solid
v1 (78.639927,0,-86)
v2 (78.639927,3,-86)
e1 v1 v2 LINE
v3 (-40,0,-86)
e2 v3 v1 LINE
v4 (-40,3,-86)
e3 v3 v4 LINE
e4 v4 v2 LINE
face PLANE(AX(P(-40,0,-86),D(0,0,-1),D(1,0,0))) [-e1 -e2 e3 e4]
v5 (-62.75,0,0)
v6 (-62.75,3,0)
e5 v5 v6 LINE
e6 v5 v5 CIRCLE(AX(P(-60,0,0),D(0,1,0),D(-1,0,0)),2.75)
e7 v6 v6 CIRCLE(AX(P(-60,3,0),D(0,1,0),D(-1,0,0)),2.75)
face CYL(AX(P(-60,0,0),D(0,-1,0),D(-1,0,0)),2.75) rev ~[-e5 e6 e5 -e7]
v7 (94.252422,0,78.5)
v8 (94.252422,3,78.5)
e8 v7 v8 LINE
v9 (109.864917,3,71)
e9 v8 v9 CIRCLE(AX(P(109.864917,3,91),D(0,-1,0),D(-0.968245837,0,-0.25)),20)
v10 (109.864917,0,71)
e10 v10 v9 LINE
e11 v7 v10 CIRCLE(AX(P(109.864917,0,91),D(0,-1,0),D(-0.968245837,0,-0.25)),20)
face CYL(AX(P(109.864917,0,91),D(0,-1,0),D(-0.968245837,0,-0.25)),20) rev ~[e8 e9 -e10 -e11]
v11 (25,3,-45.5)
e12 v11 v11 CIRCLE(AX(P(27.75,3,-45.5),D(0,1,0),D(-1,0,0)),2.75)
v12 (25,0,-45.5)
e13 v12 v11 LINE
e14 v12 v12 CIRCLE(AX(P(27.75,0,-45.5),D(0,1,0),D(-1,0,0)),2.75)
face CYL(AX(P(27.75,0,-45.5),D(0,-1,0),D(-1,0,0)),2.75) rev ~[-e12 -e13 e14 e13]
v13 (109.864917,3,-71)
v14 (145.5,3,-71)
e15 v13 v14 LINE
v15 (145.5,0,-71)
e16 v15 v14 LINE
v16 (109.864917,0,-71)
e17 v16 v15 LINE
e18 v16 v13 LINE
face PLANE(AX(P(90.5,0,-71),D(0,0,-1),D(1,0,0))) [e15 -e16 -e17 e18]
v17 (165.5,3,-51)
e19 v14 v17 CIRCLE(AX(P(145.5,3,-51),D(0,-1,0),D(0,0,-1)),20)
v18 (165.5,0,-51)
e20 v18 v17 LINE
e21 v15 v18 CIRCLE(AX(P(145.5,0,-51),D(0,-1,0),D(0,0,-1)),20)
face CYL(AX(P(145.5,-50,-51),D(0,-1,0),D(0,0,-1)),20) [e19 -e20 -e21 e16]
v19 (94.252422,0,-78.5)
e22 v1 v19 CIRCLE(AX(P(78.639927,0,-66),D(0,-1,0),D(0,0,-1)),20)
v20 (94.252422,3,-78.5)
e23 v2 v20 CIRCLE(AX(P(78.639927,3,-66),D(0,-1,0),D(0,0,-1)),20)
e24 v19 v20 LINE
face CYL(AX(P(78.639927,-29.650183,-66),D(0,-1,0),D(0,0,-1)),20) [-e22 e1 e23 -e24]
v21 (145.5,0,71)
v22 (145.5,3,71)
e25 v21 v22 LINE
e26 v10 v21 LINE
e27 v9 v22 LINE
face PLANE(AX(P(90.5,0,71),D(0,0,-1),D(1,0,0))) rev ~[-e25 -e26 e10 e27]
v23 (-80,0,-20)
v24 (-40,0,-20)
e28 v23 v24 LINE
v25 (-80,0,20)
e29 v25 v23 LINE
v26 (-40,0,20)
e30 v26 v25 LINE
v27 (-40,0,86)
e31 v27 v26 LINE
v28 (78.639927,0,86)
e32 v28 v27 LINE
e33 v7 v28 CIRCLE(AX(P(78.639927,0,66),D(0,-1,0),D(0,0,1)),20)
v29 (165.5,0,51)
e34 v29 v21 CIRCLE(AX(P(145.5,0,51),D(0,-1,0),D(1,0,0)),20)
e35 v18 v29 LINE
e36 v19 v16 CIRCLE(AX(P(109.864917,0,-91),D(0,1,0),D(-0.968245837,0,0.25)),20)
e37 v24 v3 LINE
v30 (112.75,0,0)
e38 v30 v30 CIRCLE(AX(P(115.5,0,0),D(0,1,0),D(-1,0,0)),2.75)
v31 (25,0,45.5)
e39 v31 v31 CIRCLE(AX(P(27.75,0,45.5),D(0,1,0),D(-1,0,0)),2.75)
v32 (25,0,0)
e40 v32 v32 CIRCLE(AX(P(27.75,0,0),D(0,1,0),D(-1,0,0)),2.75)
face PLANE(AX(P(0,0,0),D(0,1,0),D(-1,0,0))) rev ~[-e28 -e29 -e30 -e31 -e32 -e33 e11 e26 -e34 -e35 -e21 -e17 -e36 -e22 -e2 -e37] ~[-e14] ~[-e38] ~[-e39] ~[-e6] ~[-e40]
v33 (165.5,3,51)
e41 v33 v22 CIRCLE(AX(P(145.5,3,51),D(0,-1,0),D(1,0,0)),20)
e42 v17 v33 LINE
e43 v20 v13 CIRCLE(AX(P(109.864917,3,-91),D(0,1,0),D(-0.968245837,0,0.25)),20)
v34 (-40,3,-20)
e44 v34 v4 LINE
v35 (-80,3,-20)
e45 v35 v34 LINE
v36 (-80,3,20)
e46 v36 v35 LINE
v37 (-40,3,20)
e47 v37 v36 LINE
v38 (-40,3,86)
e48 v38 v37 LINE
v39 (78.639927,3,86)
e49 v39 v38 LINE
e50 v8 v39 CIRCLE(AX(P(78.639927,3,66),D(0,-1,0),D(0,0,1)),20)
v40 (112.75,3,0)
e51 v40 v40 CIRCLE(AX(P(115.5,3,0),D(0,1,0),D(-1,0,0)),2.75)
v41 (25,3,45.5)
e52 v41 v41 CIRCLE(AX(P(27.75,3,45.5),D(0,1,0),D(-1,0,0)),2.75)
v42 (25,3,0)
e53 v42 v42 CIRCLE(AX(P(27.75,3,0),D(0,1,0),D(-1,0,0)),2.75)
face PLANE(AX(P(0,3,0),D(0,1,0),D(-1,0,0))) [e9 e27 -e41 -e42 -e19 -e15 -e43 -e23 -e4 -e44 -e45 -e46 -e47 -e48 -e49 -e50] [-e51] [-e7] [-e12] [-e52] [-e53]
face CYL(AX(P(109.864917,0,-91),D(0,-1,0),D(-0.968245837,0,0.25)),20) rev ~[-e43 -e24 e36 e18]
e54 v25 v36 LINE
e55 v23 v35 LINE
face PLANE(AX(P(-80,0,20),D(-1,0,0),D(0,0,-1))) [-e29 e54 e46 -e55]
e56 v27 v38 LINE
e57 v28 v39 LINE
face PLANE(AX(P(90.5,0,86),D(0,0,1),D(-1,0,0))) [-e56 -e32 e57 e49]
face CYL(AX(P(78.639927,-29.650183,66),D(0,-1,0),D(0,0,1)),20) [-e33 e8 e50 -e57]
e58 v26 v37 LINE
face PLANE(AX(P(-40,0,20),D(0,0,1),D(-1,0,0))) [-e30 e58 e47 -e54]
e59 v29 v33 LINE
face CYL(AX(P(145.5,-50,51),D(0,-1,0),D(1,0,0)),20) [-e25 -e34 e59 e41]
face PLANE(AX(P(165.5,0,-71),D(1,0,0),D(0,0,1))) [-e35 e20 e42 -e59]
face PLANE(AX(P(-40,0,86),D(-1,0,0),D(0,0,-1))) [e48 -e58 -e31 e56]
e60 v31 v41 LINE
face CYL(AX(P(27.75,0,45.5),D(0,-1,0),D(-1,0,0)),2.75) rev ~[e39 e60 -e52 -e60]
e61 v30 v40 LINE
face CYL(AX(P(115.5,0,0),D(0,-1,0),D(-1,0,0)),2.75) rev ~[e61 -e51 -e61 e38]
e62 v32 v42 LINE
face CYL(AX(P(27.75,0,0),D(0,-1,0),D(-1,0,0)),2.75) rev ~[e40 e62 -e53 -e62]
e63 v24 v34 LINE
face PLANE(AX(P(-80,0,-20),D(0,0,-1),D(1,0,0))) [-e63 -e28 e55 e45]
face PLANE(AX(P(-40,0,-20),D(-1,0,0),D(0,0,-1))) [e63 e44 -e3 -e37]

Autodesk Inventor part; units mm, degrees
ref_plane "YZ Plane" through (0, 0, 0) normal (1, 0, 0) x (0, 1, 0)
ref_plane "XZ Plane" through (0, 0, 0) normal (0, 1, 0) x (-1, 0, 0)
ref_plane "XY Plane" through (0, 0, 0) normal (0, 0, 1) x (1, 0, 0)
sketch "Sketch1" plane through (0, 0, 0) normal (0, 1, 0) x (-1, 0, 0)
  line L0 (40, 20) -> (80, 20)
  line L1 (80, 20) -> (80, -20)
  line L2 (80, -20) -> (40, -20)
  line L3 (40, -20) -> (40, 20)
  circle A0 centre (60, 0) radius 2.75
  line L4 (40, -86) -> (-165.5, -86)
  line L5 (-165.5, -86) -> (-165.5, 86)
  line L6 (-165.5, 86) -> (40, 86)
  line L7 (40, 86) -> (40, -86)
  line L8 (-165.5, -86) -> (-90.5, -86)
  line L9 (-90.5, -86) -> (-90.5, -71)
  line L10 (-90.5, -71) -> (-165.5, -71)
  line L11 (-165.5, -71) -> (-165.5, -86)
  line L12 (-165.5, 86) -> (-90.5, 86)
  line L13 (-90.5, 86) -> (-90.5, 71)
  line L14 (-90.5, 71) -> (-165.5, 71)
  line L15 (-165.5, 71) -> (-165.5, 86)
  circle A1 centre (-27.75, 0) radius 2.75
  circle A2 centre (-27.75, 45.5) radius 2.75
  circle A3 centre (-27.75, -45.5) radius 2.75
  circle A4 centre (-115.5, 0) radius 2.75
  point P0 (-165.5, 0)
  dimension "d0" = 40
  dimension "d1" = 40
  dimension "d7" = 5.5
  dimension "d24" = 75
  dimension "d25" = 15
  dimension "d26" = 75
  dimension "d27" = 15
  dimension "d29" = 5.5
  dimension "d30" = 5.5
  dimension "d31" = 5.5
  dimension "d32" = 5.5
extrude "Extrusion1" add sketch "Sketch1" along normal blind 3 contours L0 L1 L2 L3 | L3 L7 L4 L9 L10 L5 L14 L13 L6
fillet "Fillet6" radius 20 6 edges at (90.5, 1.5, 86) (90.5, 1.5, 71) (165.5, 1.5, 71) (90.5, 1.5, -86) (90.5, 1.5, -71) (165.5, 1.5, -71)
properties part number "Chassis Front Plate"
